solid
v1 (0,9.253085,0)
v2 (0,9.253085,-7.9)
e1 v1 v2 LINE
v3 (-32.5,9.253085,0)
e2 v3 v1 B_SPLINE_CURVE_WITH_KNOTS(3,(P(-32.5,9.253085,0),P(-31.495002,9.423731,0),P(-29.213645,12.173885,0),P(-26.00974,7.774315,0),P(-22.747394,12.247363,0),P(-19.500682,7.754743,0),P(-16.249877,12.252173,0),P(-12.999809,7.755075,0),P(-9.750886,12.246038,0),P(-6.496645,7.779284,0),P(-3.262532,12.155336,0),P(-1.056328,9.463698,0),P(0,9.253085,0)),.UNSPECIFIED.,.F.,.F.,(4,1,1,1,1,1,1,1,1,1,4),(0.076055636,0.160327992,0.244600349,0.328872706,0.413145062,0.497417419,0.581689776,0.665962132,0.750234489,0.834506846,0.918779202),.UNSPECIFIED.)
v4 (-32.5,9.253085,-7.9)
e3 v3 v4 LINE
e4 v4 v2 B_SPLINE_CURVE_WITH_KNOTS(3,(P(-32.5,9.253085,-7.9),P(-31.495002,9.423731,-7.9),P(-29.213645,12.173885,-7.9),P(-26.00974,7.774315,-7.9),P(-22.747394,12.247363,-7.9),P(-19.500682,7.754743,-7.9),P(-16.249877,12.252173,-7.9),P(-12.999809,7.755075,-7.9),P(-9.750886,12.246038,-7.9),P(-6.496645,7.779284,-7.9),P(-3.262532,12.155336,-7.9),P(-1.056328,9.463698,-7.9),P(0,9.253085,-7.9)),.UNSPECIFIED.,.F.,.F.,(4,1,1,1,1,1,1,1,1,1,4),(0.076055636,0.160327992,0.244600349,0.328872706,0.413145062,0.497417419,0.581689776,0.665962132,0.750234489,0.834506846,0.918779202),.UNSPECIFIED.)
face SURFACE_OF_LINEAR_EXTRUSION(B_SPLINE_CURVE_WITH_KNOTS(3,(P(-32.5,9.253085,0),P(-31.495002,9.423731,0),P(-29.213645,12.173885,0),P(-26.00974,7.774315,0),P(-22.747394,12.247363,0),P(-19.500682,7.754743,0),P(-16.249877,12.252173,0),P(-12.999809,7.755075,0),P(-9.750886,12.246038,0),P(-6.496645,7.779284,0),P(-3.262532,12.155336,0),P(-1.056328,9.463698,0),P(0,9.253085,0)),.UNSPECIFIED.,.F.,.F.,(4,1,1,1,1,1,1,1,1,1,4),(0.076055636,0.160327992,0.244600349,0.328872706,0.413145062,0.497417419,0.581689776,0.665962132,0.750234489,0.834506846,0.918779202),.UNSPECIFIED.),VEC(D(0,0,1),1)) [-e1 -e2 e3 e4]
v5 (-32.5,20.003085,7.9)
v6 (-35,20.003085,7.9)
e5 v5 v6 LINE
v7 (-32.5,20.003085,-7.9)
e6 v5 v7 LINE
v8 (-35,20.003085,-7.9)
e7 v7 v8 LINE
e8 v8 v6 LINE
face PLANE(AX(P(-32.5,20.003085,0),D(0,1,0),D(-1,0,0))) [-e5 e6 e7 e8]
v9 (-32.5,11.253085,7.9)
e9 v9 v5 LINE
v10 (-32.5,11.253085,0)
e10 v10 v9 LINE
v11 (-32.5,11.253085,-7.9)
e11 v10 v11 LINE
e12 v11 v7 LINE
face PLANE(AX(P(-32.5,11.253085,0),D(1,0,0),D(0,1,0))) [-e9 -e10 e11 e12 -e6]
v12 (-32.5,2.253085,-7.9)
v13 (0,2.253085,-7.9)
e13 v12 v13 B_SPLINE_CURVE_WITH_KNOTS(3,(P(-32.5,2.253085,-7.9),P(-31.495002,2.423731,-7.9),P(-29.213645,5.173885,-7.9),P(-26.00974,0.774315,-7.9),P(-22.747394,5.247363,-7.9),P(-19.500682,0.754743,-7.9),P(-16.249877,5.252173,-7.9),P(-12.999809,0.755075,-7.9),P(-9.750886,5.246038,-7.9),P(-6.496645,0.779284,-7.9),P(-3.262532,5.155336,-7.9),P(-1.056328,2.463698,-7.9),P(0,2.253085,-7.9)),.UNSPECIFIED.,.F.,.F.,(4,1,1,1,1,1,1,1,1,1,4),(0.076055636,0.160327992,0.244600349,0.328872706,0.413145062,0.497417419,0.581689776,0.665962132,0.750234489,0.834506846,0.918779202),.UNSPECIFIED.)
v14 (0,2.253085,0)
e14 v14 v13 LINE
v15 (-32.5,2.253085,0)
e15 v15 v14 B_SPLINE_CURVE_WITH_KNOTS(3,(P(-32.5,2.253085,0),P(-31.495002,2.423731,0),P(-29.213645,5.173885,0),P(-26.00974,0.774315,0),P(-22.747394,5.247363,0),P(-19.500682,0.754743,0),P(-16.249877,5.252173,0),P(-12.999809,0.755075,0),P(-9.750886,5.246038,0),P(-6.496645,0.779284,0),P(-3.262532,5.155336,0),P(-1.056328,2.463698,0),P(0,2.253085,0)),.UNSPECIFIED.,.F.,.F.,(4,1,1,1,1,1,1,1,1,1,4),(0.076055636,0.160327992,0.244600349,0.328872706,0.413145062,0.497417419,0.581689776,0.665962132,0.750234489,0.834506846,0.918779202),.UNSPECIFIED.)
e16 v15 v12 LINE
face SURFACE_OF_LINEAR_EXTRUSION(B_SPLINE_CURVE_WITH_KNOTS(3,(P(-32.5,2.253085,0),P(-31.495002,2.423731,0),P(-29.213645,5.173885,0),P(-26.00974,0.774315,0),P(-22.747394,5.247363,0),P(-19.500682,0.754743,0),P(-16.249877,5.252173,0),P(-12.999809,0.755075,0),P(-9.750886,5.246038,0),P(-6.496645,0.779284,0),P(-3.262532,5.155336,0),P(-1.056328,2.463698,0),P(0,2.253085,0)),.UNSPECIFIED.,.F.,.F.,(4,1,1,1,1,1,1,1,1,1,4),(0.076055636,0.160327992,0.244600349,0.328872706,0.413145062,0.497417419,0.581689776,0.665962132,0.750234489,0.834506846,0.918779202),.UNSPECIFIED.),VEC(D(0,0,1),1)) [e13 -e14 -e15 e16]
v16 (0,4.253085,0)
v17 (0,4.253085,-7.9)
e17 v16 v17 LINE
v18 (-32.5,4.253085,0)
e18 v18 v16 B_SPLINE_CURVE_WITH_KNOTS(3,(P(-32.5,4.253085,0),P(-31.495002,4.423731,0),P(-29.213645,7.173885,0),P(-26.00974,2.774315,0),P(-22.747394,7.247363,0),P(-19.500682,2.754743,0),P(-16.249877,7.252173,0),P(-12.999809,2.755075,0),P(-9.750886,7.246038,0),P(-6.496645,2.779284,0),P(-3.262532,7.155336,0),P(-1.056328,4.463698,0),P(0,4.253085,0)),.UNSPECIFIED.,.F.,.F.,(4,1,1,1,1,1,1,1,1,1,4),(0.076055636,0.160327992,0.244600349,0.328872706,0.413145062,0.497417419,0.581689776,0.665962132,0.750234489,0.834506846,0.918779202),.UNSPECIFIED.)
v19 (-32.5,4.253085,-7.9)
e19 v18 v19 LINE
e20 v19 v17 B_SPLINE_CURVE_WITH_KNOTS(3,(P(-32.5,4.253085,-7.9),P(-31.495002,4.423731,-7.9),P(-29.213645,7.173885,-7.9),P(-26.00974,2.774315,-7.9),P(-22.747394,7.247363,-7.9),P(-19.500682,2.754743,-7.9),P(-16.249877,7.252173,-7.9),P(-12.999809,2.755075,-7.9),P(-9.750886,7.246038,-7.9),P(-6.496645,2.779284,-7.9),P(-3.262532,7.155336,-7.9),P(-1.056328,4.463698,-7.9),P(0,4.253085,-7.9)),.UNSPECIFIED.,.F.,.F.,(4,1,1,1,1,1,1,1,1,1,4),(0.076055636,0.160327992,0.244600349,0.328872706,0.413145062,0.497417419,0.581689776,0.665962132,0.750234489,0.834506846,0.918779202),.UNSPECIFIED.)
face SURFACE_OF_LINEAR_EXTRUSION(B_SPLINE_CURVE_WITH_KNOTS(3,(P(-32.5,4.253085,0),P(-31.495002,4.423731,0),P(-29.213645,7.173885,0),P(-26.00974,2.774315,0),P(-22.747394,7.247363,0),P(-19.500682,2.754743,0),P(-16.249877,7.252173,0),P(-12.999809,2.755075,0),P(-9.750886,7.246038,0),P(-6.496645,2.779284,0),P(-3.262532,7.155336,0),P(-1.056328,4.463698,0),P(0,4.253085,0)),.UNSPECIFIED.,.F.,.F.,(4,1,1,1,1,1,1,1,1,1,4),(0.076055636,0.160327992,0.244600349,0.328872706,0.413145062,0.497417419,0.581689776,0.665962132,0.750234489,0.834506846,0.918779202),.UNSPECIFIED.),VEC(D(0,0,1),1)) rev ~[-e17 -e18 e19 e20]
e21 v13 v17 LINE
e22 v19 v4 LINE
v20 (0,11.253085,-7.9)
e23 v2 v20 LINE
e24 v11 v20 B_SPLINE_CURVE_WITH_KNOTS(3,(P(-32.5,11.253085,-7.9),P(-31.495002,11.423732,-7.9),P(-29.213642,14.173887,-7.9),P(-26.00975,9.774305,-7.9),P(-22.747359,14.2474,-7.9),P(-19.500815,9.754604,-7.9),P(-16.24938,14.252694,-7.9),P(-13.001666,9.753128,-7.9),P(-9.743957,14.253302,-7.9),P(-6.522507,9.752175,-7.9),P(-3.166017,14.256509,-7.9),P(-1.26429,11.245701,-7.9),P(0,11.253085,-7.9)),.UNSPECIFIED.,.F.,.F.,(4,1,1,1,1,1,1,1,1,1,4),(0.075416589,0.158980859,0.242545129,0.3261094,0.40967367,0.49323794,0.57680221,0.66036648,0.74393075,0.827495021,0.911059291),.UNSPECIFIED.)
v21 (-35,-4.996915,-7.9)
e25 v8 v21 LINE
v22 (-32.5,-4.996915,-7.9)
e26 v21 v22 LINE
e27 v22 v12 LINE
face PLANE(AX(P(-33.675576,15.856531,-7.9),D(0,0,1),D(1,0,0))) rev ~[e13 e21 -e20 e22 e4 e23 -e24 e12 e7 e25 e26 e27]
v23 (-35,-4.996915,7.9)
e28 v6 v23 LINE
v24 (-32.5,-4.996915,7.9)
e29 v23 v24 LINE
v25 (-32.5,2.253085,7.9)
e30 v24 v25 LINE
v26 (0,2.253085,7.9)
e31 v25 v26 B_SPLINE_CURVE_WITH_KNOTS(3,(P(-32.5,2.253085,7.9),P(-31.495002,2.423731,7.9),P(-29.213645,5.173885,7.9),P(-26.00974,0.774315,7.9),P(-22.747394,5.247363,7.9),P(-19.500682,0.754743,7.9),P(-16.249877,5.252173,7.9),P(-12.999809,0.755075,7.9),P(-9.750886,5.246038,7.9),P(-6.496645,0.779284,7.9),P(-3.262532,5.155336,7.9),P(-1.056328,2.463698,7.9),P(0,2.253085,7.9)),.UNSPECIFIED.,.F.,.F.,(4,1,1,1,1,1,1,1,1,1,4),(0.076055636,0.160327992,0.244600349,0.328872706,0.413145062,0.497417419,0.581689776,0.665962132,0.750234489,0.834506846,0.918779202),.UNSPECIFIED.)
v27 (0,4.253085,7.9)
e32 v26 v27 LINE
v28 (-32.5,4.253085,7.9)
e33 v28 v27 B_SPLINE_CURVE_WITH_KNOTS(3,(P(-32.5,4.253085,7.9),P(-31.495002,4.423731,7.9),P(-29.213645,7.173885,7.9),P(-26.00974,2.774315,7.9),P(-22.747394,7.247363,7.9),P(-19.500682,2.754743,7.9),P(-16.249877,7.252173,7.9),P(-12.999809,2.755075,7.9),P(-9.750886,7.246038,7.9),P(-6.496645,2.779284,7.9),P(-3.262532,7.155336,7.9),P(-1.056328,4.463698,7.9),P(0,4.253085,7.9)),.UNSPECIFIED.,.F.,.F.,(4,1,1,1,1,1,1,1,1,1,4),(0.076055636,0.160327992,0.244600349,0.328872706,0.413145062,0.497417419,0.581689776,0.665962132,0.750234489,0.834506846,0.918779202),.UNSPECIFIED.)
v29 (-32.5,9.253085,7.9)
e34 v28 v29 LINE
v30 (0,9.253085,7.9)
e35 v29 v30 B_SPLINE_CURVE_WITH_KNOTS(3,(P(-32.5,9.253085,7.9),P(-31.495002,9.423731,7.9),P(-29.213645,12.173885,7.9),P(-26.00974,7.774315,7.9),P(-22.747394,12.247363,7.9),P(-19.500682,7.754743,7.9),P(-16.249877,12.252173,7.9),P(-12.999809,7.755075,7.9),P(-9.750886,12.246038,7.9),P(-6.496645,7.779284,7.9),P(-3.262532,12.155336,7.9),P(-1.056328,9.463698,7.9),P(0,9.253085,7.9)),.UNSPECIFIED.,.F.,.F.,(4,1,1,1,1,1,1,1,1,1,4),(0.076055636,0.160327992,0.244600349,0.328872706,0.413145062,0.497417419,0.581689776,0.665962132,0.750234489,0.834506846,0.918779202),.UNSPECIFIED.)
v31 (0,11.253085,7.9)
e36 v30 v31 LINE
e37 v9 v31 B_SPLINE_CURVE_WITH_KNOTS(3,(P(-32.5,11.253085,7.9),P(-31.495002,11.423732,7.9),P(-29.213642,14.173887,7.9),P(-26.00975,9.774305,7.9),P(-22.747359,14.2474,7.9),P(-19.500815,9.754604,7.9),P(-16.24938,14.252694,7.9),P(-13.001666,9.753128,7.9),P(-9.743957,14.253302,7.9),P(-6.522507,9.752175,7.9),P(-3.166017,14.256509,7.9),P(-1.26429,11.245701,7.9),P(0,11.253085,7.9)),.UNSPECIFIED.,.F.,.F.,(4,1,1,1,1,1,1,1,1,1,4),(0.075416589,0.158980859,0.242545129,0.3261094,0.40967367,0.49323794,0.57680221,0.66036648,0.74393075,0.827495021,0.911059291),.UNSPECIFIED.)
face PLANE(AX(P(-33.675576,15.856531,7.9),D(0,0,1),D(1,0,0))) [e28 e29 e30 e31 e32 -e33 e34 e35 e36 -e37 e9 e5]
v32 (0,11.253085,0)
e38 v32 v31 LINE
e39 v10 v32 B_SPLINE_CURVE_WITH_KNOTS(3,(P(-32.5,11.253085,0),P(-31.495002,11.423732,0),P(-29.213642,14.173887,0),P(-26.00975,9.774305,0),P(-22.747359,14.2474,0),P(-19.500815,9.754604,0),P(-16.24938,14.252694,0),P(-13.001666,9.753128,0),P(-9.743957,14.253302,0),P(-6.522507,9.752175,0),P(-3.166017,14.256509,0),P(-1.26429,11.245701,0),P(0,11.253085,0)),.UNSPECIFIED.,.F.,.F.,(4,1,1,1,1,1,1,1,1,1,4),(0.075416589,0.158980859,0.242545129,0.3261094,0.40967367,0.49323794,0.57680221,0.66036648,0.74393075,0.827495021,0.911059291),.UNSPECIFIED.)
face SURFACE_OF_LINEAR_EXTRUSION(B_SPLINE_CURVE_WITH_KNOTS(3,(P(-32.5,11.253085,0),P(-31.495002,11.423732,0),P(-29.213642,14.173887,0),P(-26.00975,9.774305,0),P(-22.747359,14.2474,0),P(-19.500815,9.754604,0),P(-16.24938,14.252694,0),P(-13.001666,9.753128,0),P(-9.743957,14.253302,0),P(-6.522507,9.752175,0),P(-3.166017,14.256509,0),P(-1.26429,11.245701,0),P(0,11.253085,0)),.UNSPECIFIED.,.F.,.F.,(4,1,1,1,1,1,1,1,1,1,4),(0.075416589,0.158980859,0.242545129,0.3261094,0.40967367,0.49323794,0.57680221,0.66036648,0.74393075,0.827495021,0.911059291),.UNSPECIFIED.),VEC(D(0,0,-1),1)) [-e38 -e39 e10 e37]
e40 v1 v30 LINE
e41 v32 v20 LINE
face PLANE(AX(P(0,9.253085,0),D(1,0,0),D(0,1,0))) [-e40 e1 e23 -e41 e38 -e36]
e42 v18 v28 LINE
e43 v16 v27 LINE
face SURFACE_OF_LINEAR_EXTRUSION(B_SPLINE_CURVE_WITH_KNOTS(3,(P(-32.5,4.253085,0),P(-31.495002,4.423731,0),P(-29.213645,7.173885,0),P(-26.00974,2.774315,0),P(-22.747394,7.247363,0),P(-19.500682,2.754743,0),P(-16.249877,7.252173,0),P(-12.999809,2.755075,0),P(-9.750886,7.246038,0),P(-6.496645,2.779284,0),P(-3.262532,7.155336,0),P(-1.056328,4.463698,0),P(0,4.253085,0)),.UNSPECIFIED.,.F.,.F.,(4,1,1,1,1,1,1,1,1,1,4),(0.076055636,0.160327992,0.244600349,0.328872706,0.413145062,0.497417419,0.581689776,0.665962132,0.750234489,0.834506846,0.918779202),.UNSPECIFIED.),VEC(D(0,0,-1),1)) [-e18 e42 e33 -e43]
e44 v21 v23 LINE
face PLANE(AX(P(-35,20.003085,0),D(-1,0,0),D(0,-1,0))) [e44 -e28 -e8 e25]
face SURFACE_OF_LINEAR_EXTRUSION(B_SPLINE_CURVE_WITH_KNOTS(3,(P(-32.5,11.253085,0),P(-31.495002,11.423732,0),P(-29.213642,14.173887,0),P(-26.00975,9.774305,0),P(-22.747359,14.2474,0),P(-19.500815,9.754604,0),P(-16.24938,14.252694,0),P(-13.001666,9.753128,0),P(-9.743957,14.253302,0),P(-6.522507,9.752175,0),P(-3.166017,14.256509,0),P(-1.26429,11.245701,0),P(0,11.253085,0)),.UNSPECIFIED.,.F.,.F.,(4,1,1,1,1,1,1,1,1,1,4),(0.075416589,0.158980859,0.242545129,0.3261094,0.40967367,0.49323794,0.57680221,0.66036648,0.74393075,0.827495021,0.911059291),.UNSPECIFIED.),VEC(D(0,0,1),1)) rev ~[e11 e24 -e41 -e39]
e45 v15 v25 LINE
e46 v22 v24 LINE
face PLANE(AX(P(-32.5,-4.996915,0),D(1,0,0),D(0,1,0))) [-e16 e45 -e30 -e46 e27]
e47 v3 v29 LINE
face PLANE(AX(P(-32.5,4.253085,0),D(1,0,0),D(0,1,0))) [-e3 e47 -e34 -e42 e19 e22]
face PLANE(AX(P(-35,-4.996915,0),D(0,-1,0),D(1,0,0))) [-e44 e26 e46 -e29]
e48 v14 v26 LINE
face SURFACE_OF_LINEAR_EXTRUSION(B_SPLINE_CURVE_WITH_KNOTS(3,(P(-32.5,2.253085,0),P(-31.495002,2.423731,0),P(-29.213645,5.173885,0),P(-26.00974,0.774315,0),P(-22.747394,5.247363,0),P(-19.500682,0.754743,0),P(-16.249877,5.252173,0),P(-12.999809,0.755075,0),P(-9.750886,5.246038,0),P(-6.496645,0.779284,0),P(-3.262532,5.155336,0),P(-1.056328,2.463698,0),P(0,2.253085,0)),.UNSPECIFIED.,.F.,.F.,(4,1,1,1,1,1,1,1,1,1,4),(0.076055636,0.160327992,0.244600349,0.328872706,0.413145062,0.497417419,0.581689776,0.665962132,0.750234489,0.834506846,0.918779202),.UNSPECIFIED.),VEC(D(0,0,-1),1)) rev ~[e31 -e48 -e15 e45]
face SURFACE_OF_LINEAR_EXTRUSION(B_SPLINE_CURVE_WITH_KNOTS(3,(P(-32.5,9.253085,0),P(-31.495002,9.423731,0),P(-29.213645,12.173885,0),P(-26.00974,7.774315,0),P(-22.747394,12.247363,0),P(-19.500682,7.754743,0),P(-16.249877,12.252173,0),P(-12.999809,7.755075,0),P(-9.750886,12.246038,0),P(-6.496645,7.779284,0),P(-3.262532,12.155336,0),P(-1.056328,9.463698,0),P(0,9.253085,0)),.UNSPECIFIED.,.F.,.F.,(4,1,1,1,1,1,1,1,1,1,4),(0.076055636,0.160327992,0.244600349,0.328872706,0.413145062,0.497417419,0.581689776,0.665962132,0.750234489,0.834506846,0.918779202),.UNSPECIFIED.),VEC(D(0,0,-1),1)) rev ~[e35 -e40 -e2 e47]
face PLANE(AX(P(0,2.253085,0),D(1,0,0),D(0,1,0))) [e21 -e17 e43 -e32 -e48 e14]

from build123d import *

# Parameters (mm, degrees)
F1_DEPTH = 7.9


with BuildPart() as f1:
    # F0 (on Top) → F1 (new body, symmetric)
    with BuildSketch(Plane.XY):
        with BuildLine():
            Line((-32.5, 20.0030848121), (-35, 20.0030848121))
            Line((-35, 20.0030848121), (-35, 12.7530848121))
            add(Edge.make_bspline(
                [(-35, 12.7530848121), (-34.2035043996, 11.9260806463), (-33.4070087991, 11.0990764805), (-32.5, 11.2530848121)],
                knots=[0, 0, 0, 0, 0.0754165891, 0.0754165891, 0.0754165891, 0.0754165891], degree=3))
            Line((-32.5, 11.2530848121), (-32.5, 20.0030848121))
        make_face()
        with BuildLine():
            add(Edge.make_bspline(
                [(-35, 12.7530848121), (-34.2035043996, 11.9260806463), (-33.4070087991, 11.0990764805), (-32.5, 11.2530848121)],
                knots=[0, 0, 0, 0, 0.0754165891, 0.0754165891, 0.0754165891, 0.0754165891], degree=3))
            Line((-35, 12.7530848121), (-35, 10.7530848121))
            add(Edge.make_bspline(
                [(-35, 10.7530848121), (-34.2035042168, 9.9260808378), (-33.4070084337, 9.0990768636), (-32.5, 9.2530848121)],
                knots=[0, 0, 0, 0, 0.0760556357, 0.0760556357, 0.0760556357, 0.0760556357], degree=3))
            Line((-32.5, 9.2530848121), (-32.5, 11.2530848121))
        make_face()
        with BuildLine():
            add(Edge.make_bspline(
                [(-32.5, 11.2530848121), (-31.4950019052, 11.4237315357), (-29.2136420975, 14.1738874896), (-26.009749801, 9.7743053553), (-22.7473586987, 14.2473999618), (-19.5008154044, 9.75460367), (-16.2493796837, 14.2526942305), (-13.0016658609, 9.7531282803), (-9.7439568726, 14.2533015207), (-6.5225066486, 9.7521745093), (-3.1660165331, 14.2565093144), (-1.2642903237, 11.2457011751), (0, 11.2530848121)],
                knots=[0.0754165891, 0.0754165891, 0.0754165891, 0.0754165891, 0.1589808592, 0.2425451294, 0.3261093996, 0.4096736697, 0.4932379399, 0.5768022101, 0.6603664802, 0.7439307504, 0.8274950205, 0.9110592907, 0.9110592907, 0.9110592907, 0.9110592907], degree=3))
            Line((-32.5, 11.2530848121), (-32.5, 9.2530848121))
            add(Edge.make_bspline(
                [(-32.5, 9.2530848121), (-31.4950023101, 9.4237311112), (-29.2136446583, 12.1738848053), (-26.0097402308, 7.7743153872), (-22.7473944185, 12.2473625184), (-19.5006820954, 7.7547434118), (-16.2498772001, 12.252172707), (-12.9998091044, 7.7550746328), (-9.7508863824, 12.2460376344), (-6.4966453659, 7.779283702), (-3.2625321541, 12.1553364301), (-1.0563280632, 9.4636984435), (0, 9.2530848121)],
                knots=[0.0760556357, 0.0760556357, 0.0760556357, 0.0760556357, 0.1603279924, 0.244600349, 0.3288727057, 0.4131450623, 0.497417419, 0.5816897756, 0.6659621323, 0.7502344889, 0.8345068456, 0.9187792022, 0.9187792022, 0.9187792022, 0.9187792022], degree=3))
            Line((0, 9.2530848121), (0, 11.2530848121))
        make_face()
        with BuildLine():
            add(Edge.make_bspline(
                [(-35, 10.7530848121), (-34.2035042168, 9.9260808378), (-33.4070084337, 9.0990768636), (-32.5, 9.2530848121)],
                knots=[0, 0, 0, 0, 0.0760556357, 0.0760556357, 0.0760556357, 0.0760556357], degree=3))
            Line((-35, 10.7530848121), (-35, 5.7530848121))
            add(Edge.make_bspline(
                [(-35, 5.7530848121), (-34.2035042168, 4.9260808378), (-33.4070084337, 4.0990768636), (-32.5, 4.2530848121)],
                knots=[0, 0, 0, 0, 0.0760556357, 0.0760556357, 0.0760556357, 0.0760556357], degree=3))
            Line((-32.5, 4.2530848121), (-32.5, 9.2530848121))
        make_face()
        with BuildLine():
            add(Edge.make_bspline(
                [(-35, 5.7530848121), (-34.2035042168, 4.9260808378), (-33.4070084337, 4.0990768636), (-32.5, 4.2530848121)],
                knots=[0, 0, 0, 0, 0.0760556357, 0.0760556357, 0.0760556357, 0.0760556357], degree=3))
            Line((-35, 5.7530848121), (-35, 3.7530848121))
            add(Edge.make_bspline(
                [(-35, 3.7530848121), (-34.2035042168, 2.9260808378), (-33.4070084337, 2.0990768636), (-32.5, 2.2530848121)],
                knots=[0, 0, 0, 0, 0.0760556357, 0.0760556357, 0.0760556357, 0.0760556357], degree=3))
            Line((-32.5, 2.2530848121), (-32.5, 4.2530848121))
        make_face()
        with BuildLine():
            add(Edge.make_bspline(
                [(-32.5, 4.2530848121), (-31.4950023101, 4.4237311112), (-29.2136446583, 7.1738848053), (-26.0097402308, 2.7743153872), (-22.7473944185, 7.2473625184), (-19.5006820954, 2.7547434118), (-16.2498772001, 7.252172707), (-12.9998091044, 2.7550746328), (-9.7508863824, 7.2460376344), (-6.4966453659, 2.779283702), (-3.2625321541, 7.1553364301), (-1.0563280632, 4.4636984435), (0, 4.2530848121)],
                knots=[0.0760556357, 0.0760556357, 0.0760556357, 0.0760556357, 0.1603279924, 0.244600349, 0.3288727057, 0.4131450623, 0.497417419, 0.5816897756, 0.6659621323, 0.7502344889, 0.8345068456, 0.9187792022, 0.9187792022, 0.9187792022, 0.9187792022], degree=3))
            Line((-32.5, 4.2530848121), (-32.5, 2.2530848121))
            add(Edge.make_bspline(
                [(-32.5, 2.2530848121), (-31.4950023101, 2.4237311112), (-29.2136446583, 5.1738848053), (-26.0097402308, 0.7743153872), (-22.7473944185, 5.2473625184), (-19.5006820954, 0.7547434118), (-16.2498772001, 5.252172707), (-12.9998091044, 0.7550746328), (-9.7508863824, 5.2460376344), (-6.4966453659, 0.779283702), (-3.2625321541, 5.1553364301), (-1.0563280632, 2.4636984435), (0, 2.2530848121)],
                knots=[0.0760556357, 0.0760556357, 0.0760556357, 0.0760556357, 0.1603279924, 0.244600349, 0.3288727057, 0.4131450623, 0.497417419, 0.5816897756, 0.6659621323, 0.7502344889, 0.8345068456, 0.9187792022, 0.9187792022, 0.9187792022, 0.9187792022], degree=3))
            Line((0, 2.2530848121), (0, 4.2530848121))
        make_face()
        with BuildLine():
            add(Edge.make_bspline(
                [(-35, 3.7530848121), (-34.2035042168, 2.9260808378), (-33.4070084337, 2.0990768636), (-32.5, 2.2530848121)],
                knots=[0, 0, 0, 0, 0.0760556357, 0.0760556357, 0.0760556357, 0.0760556357], degree=3))
            Line((-35, 3.7530848121), (-35, -4.9969151879))
            Line((-35, -4.9969151879), (-32.5, -4.9969151879))
            Line((-32.5, -4.9969151879), (-32.5, 2.2530848121))
        make_face()
    extrude(amount=F1_DEPTH, both=True)


solid = f1.part
